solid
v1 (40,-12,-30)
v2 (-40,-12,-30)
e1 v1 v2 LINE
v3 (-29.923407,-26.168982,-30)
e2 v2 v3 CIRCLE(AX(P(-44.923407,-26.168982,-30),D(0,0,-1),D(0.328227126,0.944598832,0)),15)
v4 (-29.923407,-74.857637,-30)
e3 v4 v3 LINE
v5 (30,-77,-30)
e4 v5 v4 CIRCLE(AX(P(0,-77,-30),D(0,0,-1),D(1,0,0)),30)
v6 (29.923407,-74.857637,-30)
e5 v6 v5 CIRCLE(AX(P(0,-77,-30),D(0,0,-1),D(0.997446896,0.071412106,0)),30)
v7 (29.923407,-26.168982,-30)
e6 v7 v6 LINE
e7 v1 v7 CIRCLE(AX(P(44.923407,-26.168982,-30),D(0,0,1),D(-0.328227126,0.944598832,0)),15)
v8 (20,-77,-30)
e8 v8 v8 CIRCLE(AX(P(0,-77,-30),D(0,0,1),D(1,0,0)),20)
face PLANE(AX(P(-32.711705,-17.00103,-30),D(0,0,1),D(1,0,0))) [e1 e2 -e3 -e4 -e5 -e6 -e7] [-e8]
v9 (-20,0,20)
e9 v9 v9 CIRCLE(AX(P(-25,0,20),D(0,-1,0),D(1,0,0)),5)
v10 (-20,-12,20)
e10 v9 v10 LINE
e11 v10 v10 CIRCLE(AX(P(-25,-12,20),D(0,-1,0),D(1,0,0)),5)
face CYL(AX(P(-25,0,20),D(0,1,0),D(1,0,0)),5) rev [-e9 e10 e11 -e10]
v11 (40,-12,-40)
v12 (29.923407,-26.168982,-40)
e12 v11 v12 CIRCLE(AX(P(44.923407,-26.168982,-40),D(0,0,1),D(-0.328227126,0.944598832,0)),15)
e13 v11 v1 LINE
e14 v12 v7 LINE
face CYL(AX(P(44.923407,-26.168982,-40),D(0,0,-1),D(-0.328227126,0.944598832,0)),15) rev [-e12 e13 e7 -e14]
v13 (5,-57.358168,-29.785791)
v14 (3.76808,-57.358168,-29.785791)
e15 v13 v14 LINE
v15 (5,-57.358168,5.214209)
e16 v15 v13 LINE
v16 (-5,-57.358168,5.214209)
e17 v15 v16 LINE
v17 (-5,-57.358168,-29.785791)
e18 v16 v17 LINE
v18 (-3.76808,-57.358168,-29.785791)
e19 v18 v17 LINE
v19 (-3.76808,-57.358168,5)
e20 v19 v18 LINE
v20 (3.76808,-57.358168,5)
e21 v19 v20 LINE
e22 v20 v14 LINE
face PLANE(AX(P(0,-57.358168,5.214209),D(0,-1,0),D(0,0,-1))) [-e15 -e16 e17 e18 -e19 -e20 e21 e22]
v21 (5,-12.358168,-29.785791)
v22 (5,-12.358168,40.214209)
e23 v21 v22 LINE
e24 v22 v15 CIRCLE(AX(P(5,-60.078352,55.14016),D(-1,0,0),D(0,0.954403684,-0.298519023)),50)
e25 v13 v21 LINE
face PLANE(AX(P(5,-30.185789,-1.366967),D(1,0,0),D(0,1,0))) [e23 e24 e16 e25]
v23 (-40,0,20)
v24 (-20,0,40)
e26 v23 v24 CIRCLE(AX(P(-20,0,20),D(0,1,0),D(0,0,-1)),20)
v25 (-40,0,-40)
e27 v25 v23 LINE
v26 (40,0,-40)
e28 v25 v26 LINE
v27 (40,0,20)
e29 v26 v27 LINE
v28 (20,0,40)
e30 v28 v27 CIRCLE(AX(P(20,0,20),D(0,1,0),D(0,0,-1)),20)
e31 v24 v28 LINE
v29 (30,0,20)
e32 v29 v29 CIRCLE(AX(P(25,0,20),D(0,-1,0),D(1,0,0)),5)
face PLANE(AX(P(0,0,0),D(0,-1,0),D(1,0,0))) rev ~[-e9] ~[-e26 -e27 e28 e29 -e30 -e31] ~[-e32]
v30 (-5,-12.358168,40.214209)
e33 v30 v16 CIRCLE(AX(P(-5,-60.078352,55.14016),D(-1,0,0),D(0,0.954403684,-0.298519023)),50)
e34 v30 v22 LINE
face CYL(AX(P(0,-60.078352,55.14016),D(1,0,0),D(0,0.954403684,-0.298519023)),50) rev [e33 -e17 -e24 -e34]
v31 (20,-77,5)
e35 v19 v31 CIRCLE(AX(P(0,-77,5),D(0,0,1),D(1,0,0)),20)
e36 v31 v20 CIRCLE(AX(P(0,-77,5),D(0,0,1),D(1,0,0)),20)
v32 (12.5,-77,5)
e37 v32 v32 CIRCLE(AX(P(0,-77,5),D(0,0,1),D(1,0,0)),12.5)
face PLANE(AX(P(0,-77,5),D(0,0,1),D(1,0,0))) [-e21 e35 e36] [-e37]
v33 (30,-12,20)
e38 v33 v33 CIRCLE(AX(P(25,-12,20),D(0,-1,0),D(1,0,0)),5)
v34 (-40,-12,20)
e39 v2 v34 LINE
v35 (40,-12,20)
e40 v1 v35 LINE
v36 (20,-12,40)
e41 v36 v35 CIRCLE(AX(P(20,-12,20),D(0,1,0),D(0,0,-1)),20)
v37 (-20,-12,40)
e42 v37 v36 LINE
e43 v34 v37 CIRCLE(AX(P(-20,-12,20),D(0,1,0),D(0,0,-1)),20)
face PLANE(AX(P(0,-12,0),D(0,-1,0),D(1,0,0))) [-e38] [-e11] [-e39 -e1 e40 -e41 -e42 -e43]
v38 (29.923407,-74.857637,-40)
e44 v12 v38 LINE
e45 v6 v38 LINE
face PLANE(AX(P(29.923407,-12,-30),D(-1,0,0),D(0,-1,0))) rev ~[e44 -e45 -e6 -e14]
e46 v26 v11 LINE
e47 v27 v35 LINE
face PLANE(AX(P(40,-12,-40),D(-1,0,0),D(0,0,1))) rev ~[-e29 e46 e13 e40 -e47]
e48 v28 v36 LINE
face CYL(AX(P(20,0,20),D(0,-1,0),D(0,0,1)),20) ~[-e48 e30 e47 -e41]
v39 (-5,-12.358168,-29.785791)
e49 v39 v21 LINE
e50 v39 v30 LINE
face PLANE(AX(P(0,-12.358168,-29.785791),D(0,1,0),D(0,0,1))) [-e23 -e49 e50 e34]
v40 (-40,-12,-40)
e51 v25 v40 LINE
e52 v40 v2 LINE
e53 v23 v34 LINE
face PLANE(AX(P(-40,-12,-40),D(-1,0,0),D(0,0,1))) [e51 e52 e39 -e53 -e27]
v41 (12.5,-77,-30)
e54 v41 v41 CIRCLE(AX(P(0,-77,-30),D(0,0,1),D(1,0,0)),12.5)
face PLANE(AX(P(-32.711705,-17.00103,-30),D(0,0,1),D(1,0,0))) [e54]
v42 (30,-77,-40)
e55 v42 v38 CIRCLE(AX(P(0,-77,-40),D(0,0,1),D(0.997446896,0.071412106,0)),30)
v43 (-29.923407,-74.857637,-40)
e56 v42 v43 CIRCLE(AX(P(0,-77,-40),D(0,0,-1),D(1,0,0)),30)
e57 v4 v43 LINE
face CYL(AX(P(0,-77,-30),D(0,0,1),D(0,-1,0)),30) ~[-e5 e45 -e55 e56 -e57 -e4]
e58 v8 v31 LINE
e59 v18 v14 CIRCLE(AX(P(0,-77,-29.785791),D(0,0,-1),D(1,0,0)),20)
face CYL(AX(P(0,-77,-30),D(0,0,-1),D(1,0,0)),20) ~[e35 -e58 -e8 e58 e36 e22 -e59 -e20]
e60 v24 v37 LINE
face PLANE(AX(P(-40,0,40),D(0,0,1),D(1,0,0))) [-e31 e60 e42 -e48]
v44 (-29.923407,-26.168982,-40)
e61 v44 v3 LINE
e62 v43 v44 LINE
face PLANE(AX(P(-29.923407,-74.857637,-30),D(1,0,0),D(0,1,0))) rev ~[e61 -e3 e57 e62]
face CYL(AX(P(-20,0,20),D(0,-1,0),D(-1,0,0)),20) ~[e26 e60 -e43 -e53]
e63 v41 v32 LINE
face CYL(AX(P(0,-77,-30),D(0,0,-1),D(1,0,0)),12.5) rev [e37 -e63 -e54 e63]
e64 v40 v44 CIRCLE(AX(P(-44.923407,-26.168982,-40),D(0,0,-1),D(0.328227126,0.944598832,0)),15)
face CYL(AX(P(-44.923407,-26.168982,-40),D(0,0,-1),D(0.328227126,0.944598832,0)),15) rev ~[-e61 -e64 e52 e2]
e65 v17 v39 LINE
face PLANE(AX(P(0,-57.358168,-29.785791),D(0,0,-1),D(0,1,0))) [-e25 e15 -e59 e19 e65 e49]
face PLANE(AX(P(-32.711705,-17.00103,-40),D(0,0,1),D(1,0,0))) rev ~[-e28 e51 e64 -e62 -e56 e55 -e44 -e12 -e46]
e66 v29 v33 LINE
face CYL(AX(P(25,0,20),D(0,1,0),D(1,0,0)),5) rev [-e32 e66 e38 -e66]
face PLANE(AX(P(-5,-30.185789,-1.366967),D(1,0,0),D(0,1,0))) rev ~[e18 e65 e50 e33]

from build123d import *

# Parameters (mm, degrees)
F0_W        = 80
F0_H        = 80
F0_R        = 5
F1_DEPTH    = 12
F2_R        = 20
F3_W        = 80
F3_H        = 10
F4_DEPTH    = 95
F6_DEPTH    = 25
F7_T1_DEPTH = 10
F8_R        = 20
F8_R_2      = 12.5
F9_DEPTH    = 35
F11_DEPTH   = 5


# Not quite as in the source:
# - a fillet or chamfer that OpenCascade refuses, or shapes differently, is made with other operations: its cross-section is extruded or revolved along the edge and cut away or added


with BuildPart() as f1:
    # F0 (on Front) → F1 (new body)
    with BuildSketch(Plane.XZ):
        Rectangle(F0_W, F0_H)
        with Locations((-25, 20)):
            Circle(F0_R, mode=Mode.SUBTRACT)
        with Locations((25, 20)):
            Circle(F0_R, mode=Mode.SUBTRACT)
    extrude(amount=F1_DEPTH)

    # F2
    f2_edges = [f1.edges().sort_by_distance(p)[0] for p in [
        (40, -6, 40),
        (-40, -6, 40),
    ]]
    fillet(f2_edges, radius=F2_R)

    # F3 (on face) → F4 (join)
    with BuildSketch(Plane.XZ.offset(12)):
        with Locations((0, -35)):
            Rectangle(F3_W, F3_H)
    extrude(amount=F4_DEPTH)

    # F5 (on face) → F6 (cut)
    with BuildSketch(Plane.XY.offset(-30)):
        with BuildLine():
            Line((-40, -107), (0, -107))
            ThreePointArc((0, -107), (-21.9575829196, -97.4417355508), (-29.9234068918, -74.857636822))
            Line((-29.9234068918, -74.857636822), (-29.9234068918, -12))
            Line((-29.9234068918, -12), (-40, -12))
            Line((-40, -12), (-40, -107))
        make_face()
        with BuildLine():
            ThreePointArc((29.9234068918, -74.857636822), (29.9808456081, -75.9281340463), (30, -77))
            ThreePointArc((30, -77), (21.2132034356, -98.2132034356), (0, -107))
            Line((0, -107), (40, -107))
            Line((40, -107), (40, -12))
            Line((40, -12), (29.9234068918, -12))
            Line((29.9234068918, -12), (29.9234068918, -74.857636822))
        make_face()
    extrude(amount=-F6_DEPTH, mode=Mode.SUBTRACT)

    # F7: fillet of radius 15 on 2 edges, made by hand

    # F7_s2 → F7_t1 (join)
    with BuildSketch(Plane.XY.offset(-40)):
        with BuildLine():
            ThreePointArc((-40, -12), (-32.6994324281, -17.4756259202), (-29.9234068918, -26.1689824821))
            Line((-29.9234068918, -26.1689824821), (-29.9234068918, -12))
            Line((-29.9234068918, -12), (-40, -12))
        make_face()
        with BuildLine():
            ThreePointArc((40, -12), (32.6994324281, -17.4756259202), (29.9234068918, -26.1689824821))
            Line((29.9234068918, -26.1689824821), (29.9234068918, -12))
            Line((29.9234068918, -12), (40, -12))
        make_face()
    extrude(amount=F7_T1_DEPTH)

    # F8 (on face) → F9 (join)
    with BuildSketch(Plane.XY.offset(-30)):
        with Locations((0, -77)):
            Circle(F8_R)
        with Locations((0, -77)):
            Circle(F8_R_2, mode=Mode.SUBTRACT)
    extrude(amount=F9_DEPTH)

    # F10 (on Right) → F11 (join, symmetric)
    with BuildSketch(Plane.YZ):
        with BuildLine():
            Line((-57.3581678378, -29.785791263), (-12.3581678378, -29.785791263))
            Line((-12.3581678378, -29.785791263), (-12.3581678378, 40.214208737))
            ThreePointArc((-12.3581678378, 40.214208737), (-29.3813213863, 15.6725490137), (-57.3581678378, 5.214208737))
            Line((-57.3581678378, 5.214208737), (-57.3581678378, -29.785791263))
        make_face()
    extrude(amount=F11_DEPTH, both=True)


solid = f1.part
